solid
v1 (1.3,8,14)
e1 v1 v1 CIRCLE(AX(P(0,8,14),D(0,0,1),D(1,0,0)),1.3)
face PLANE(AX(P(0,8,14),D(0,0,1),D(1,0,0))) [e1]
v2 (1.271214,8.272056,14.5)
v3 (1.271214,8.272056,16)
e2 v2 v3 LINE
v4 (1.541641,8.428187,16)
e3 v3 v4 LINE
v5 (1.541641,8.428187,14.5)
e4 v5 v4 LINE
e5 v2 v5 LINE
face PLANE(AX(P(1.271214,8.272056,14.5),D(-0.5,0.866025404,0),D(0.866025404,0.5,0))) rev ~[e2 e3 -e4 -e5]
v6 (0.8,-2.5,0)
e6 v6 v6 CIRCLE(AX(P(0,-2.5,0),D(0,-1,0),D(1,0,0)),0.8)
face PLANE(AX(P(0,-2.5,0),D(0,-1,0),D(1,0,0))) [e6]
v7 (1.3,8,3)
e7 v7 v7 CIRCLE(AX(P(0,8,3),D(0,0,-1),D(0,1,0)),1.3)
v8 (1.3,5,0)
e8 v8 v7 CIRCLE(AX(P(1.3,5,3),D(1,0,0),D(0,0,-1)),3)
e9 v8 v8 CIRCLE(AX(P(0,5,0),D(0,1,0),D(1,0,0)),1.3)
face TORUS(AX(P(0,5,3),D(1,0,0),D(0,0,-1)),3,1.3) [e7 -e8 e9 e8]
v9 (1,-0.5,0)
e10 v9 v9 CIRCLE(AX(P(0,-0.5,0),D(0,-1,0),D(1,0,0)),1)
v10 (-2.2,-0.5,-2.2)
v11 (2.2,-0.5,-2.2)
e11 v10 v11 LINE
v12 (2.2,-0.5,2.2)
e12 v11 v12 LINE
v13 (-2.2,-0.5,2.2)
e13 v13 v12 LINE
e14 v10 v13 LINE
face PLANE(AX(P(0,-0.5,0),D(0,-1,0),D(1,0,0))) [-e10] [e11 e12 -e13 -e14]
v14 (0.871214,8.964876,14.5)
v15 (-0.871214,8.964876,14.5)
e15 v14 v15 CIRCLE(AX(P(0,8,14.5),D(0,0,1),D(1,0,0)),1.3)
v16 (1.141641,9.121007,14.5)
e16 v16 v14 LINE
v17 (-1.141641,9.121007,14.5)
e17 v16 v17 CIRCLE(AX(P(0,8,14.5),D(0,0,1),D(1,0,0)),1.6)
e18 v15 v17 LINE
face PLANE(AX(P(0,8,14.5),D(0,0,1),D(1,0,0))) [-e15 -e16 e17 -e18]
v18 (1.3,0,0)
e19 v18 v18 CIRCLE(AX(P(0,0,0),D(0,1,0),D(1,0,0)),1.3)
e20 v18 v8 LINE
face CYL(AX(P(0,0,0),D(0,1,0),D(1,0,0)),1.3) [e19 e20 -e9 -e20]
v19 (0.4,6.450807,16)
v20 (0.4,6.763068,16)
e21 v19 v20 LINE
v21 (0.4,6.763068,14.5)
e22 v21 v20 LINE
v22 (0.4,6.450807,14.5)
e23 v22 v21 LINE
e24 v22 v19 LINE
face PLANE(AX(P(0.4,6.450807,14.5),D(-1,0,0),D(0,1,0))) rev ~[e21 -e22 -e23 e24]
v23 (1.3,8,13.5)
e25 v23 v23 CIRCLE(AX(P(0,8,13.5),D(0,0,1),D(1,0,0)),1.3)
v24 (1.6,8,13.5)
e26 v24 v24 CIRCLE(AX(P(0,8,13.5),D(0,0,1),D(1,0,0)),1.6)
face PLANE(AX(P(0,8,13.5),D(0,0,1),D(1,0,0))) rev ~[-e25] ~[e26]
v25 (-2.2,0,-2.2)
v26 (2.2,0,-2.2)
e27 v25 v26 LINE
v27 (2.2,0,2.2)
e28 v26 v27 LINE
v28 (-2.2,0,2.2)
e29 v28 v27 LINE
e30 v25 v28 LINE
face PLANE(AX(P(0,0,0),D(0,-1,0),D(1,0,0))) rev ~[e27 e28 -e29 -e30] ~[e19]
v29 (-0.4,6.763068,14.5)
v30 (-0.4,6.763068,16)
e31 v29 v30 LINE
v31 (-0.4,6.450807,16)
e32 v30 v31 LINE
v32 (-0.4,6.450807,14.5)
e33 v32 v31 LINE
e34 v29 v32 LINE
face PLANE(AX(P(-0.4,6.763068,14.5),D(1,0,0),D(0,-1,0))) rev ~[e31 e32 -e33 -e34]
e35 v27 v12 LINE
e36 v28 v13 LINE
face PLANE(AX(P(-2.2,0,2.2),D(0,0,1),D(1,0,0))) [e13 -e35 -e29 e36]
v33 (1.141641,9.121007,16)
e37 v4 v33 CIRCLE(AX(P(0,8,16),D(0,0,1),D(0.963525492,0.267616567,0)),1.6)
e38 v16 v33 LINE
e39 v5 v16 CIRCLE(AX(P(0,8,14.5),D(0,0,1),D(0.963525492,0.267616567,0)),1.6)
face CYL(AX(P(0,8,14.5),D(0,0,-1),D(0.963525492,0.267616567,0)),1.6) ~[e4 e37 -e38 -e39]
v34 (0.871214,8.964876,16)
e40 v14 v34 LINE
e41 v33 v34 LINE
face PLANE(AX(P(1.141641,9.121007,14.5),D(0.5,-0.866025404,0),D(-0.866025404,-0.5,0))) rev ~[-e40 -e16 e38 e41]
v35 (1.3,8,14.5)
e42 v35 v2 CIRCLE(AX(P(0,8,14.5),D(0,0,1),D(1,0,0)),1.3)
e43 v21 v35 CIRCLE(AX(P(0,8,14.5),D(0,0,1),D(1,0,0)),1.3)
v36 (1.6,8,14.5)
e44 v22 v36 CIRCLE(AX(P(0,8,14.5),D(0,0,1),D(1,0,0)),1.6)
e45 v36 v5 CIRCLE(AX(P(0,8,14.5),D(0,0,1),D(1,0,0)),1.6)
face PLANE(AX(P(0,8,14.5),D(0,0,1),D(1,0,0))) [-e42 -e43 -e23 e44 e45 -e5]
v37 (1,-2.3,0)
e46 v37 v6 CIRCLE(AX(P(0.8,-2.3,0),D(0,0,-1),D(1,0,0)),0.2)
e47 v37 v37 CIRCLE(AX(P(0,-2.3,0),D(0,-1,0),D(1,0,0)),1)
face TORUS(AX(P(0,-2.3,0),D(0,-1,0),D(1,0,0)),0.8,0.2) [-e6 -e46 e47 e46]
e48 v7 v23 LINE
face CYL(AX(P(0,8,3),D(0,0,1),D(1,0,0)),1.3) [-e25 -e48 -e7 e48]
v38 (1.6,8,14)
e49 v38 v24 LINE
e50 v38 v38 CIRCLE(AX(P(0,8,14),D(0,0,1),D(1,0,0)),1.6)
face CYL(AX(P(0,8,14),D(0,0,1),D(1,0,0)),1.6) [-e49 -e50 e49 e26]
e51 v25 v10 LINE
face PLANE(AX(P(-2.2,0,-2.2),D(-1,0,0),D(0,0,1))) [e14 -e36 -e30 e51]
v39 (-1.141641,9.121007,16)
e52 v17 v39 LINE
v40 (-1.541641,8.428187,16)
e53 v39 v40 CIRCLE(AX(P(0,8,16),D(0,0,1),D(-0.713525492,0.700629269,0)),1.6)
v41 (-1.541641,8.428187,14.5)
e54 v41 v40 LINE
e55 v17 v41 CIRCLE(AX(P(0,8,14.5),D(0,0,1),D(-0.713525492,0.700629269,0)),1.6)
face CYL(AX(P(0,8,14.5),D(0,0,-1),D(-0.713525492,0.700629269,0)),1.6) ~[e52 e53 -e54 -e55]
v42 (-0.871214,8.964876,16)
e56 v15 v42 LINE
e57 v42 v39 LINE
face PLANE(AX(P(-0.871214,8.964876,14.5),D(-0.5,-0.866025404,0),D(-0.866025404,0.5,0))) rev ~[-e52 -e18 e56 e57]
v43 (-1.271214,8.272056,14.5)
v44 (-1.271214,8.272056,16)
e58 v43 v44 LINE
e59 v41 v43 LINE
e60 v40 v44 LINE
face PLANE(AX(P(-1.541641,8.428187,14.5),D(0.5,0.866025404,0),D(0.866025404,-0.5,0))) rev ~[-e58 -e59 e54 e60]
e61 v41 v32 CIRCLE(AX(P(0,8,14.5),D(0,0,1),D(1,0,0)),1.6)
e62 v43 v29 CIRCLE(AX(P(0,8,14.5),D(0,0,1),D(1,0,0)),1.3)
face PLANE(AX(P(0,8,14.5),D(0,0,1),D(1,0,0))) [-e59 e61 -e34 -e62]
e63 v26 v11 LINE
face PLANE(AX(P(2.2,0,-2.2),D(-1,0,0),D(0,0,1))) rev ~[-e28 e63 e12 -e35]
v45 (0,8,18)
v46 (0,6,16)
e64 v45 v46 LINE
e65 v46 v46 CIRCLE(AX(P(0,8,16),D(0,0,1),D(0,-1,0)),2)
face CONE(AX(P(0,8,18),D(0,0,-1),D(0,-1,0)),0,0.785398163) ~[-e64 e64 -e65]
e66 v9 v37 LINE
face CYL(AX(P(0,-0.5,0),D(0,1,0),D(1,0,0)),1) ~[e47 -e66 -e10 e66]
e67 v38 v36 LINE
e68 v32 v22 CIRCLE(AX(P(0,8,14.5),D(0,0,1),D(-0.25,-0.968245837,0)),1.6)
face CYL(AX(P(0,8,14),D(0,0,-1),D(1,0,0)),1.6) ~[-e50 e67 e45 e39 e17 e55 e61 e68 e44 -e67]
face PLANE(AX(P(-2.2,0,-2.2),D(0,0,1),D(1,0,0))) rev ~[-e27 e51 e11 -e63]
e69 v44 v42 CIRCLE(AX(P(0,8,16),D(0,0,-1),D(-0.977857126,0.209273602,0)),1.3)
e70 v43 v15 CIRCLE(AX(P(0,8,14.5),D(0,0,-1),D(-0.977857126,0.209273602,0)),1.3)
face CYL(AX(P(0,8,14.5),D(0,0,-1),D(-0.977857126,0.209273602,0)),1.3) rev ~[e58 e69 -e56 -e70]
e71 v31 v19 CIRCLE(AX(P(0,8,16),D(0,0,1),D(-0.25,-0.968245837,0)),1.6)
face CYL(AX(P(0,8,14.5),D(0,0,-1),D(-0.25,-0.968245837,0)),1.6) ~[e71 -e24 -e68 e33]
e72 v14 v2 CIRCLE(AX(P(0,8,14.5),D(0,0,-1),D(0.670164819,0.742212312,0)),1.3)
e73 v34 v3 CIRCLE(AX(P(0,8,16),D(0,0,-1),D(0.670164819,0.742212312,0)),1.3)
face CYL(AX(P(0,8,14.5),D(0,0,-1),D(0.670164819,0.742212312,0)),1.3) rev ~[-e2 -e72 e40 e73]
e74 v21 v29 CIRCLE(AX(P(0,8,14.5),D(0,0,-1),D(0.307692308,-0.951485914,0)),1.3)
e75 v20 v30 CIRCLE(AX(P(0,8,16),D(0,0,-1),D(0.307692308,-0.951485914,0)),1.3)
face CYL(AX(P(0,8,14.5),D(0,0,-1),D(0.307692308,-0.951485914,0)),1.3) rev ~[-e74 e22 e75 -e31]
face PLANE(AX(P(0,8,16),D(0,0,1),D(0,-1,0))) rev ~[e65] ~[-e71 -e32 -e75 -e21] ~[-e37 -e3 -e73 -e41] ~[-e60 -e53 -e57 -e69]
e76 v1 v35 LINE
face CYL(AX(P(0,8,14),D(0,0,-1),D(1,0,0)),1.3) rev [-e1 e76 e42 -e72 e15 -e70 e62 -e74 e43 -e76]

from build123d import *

# Parameters (mm, degrees)
F1_R             = 1.3
F3_W             = 4.4
F3_H             = 4.4
F3_R             = 1.3
F4_DEPTH         = 0.5
F5_R             = 1
F6_DEPTH         = 2
F7_R             = 0.2
F8_R             = 1.6
F8_R_2           = 1.3
F9_DEPTH         = 0.5
F9_DEPTH_BACK    = 0.5
F11_DEPTH        = 1.5
F11_COPIES_COUNT = 3


# Not quite as in the source:
# - a pattern or mirror of a feature is missing from the dataset's text; its kind, count and spacing are read off the source's solid


with BuildPart() as f2:
    # F2: sweep along a path in F0
    with BuildLine(Plane.YZ) as f2_path:
        Line((0, 0), (5, 0))
        ThreePointArc((5, 0), (7.1213203436, 0.8786796564), (8, 3))
        Line((8, 3), (8, 14))
    # F1 (on Front) → F2 (sweep)
    with BuildSketch(Plane.XZ):
        Circle(F1_R)
    sweep(path=f2_path.line)

    # F3 (on face) → F4 (join)
    with BuildSketch(Plane.XZ):
        Rectangle(F3_W, F3_H)
        Circle(F3_R, mode=Mode.SUBTRACT)
        Circle(F3_R)
    extrude(amount=F4_DEPTH)

    # F5 (on face) → F6 (join)
    with BuildSketch(Plane.XZ.offset(0.5)):
        Circle(F5_R)
    extrude(amount=F6_DEPTH)

    # F7
    f7_edges = [f2.edges().sort_by_distance(p)[0] for p in [
        (-1, -2.5, 0),
    ]]
    fillet(f7_edges, radius=F7_R)

    # F8 (on face) → F9 (join, two sides)
    with BuildSketch(Plane.XY.offset(14)) as f9_sk:
        with Locations((0, 8)):
            Circle(F8_R)
        with Locations((0, 8)):
            Circle(F8_R_2, mode=Mode.SUBTRACT)
    extrude(amount=-F9_DEPTH)
    extrude(f9_sk.sketch, amount=F9_DEPTH_BACK)

    # F10 (on face) → F11 (join)
    with BuildSketch(Plane.XY.offset(14.5)):
        with BuildLine():
            Line((-0.4, 6.7630683123), (-0.4, 6.4508066615))
            ThreePointArc((-0.4, 6.4508066615), (0, 6.4), (0.4, 6.4508066615))
            Line((0.4, 6.4508066615), (0.4, 6.7630683123))
            ThreePointArc((0.4, 6.7630683123), (0, 6.7), (-0.4, 6.7630683123))
        make_face()
    f11 = extrude(amount=F11_DEPTH)

    # F11_copies: F11 ×3 about axis
    f11_copies_axis = Axis((0, 8, 0), (0, 0, 1))
    for i in range(1, F11_COPIES_COUNT):
        add(f11.rotate(f11_copies_axis, i * 360 / F11_COPIES_COUNT))

    # F13 (on Right) → F14 (revolve)
    with BuildSketch(Plane.YZ):
        Polygon((6, 16), (6.4508066615, 16), (6.7630683123, 16), (8, 16), (8, 18), align=None)
    revolve(axis=Axis((0, 8, 17.9220158607), (0, 0, 1)))


solid = f2.part
